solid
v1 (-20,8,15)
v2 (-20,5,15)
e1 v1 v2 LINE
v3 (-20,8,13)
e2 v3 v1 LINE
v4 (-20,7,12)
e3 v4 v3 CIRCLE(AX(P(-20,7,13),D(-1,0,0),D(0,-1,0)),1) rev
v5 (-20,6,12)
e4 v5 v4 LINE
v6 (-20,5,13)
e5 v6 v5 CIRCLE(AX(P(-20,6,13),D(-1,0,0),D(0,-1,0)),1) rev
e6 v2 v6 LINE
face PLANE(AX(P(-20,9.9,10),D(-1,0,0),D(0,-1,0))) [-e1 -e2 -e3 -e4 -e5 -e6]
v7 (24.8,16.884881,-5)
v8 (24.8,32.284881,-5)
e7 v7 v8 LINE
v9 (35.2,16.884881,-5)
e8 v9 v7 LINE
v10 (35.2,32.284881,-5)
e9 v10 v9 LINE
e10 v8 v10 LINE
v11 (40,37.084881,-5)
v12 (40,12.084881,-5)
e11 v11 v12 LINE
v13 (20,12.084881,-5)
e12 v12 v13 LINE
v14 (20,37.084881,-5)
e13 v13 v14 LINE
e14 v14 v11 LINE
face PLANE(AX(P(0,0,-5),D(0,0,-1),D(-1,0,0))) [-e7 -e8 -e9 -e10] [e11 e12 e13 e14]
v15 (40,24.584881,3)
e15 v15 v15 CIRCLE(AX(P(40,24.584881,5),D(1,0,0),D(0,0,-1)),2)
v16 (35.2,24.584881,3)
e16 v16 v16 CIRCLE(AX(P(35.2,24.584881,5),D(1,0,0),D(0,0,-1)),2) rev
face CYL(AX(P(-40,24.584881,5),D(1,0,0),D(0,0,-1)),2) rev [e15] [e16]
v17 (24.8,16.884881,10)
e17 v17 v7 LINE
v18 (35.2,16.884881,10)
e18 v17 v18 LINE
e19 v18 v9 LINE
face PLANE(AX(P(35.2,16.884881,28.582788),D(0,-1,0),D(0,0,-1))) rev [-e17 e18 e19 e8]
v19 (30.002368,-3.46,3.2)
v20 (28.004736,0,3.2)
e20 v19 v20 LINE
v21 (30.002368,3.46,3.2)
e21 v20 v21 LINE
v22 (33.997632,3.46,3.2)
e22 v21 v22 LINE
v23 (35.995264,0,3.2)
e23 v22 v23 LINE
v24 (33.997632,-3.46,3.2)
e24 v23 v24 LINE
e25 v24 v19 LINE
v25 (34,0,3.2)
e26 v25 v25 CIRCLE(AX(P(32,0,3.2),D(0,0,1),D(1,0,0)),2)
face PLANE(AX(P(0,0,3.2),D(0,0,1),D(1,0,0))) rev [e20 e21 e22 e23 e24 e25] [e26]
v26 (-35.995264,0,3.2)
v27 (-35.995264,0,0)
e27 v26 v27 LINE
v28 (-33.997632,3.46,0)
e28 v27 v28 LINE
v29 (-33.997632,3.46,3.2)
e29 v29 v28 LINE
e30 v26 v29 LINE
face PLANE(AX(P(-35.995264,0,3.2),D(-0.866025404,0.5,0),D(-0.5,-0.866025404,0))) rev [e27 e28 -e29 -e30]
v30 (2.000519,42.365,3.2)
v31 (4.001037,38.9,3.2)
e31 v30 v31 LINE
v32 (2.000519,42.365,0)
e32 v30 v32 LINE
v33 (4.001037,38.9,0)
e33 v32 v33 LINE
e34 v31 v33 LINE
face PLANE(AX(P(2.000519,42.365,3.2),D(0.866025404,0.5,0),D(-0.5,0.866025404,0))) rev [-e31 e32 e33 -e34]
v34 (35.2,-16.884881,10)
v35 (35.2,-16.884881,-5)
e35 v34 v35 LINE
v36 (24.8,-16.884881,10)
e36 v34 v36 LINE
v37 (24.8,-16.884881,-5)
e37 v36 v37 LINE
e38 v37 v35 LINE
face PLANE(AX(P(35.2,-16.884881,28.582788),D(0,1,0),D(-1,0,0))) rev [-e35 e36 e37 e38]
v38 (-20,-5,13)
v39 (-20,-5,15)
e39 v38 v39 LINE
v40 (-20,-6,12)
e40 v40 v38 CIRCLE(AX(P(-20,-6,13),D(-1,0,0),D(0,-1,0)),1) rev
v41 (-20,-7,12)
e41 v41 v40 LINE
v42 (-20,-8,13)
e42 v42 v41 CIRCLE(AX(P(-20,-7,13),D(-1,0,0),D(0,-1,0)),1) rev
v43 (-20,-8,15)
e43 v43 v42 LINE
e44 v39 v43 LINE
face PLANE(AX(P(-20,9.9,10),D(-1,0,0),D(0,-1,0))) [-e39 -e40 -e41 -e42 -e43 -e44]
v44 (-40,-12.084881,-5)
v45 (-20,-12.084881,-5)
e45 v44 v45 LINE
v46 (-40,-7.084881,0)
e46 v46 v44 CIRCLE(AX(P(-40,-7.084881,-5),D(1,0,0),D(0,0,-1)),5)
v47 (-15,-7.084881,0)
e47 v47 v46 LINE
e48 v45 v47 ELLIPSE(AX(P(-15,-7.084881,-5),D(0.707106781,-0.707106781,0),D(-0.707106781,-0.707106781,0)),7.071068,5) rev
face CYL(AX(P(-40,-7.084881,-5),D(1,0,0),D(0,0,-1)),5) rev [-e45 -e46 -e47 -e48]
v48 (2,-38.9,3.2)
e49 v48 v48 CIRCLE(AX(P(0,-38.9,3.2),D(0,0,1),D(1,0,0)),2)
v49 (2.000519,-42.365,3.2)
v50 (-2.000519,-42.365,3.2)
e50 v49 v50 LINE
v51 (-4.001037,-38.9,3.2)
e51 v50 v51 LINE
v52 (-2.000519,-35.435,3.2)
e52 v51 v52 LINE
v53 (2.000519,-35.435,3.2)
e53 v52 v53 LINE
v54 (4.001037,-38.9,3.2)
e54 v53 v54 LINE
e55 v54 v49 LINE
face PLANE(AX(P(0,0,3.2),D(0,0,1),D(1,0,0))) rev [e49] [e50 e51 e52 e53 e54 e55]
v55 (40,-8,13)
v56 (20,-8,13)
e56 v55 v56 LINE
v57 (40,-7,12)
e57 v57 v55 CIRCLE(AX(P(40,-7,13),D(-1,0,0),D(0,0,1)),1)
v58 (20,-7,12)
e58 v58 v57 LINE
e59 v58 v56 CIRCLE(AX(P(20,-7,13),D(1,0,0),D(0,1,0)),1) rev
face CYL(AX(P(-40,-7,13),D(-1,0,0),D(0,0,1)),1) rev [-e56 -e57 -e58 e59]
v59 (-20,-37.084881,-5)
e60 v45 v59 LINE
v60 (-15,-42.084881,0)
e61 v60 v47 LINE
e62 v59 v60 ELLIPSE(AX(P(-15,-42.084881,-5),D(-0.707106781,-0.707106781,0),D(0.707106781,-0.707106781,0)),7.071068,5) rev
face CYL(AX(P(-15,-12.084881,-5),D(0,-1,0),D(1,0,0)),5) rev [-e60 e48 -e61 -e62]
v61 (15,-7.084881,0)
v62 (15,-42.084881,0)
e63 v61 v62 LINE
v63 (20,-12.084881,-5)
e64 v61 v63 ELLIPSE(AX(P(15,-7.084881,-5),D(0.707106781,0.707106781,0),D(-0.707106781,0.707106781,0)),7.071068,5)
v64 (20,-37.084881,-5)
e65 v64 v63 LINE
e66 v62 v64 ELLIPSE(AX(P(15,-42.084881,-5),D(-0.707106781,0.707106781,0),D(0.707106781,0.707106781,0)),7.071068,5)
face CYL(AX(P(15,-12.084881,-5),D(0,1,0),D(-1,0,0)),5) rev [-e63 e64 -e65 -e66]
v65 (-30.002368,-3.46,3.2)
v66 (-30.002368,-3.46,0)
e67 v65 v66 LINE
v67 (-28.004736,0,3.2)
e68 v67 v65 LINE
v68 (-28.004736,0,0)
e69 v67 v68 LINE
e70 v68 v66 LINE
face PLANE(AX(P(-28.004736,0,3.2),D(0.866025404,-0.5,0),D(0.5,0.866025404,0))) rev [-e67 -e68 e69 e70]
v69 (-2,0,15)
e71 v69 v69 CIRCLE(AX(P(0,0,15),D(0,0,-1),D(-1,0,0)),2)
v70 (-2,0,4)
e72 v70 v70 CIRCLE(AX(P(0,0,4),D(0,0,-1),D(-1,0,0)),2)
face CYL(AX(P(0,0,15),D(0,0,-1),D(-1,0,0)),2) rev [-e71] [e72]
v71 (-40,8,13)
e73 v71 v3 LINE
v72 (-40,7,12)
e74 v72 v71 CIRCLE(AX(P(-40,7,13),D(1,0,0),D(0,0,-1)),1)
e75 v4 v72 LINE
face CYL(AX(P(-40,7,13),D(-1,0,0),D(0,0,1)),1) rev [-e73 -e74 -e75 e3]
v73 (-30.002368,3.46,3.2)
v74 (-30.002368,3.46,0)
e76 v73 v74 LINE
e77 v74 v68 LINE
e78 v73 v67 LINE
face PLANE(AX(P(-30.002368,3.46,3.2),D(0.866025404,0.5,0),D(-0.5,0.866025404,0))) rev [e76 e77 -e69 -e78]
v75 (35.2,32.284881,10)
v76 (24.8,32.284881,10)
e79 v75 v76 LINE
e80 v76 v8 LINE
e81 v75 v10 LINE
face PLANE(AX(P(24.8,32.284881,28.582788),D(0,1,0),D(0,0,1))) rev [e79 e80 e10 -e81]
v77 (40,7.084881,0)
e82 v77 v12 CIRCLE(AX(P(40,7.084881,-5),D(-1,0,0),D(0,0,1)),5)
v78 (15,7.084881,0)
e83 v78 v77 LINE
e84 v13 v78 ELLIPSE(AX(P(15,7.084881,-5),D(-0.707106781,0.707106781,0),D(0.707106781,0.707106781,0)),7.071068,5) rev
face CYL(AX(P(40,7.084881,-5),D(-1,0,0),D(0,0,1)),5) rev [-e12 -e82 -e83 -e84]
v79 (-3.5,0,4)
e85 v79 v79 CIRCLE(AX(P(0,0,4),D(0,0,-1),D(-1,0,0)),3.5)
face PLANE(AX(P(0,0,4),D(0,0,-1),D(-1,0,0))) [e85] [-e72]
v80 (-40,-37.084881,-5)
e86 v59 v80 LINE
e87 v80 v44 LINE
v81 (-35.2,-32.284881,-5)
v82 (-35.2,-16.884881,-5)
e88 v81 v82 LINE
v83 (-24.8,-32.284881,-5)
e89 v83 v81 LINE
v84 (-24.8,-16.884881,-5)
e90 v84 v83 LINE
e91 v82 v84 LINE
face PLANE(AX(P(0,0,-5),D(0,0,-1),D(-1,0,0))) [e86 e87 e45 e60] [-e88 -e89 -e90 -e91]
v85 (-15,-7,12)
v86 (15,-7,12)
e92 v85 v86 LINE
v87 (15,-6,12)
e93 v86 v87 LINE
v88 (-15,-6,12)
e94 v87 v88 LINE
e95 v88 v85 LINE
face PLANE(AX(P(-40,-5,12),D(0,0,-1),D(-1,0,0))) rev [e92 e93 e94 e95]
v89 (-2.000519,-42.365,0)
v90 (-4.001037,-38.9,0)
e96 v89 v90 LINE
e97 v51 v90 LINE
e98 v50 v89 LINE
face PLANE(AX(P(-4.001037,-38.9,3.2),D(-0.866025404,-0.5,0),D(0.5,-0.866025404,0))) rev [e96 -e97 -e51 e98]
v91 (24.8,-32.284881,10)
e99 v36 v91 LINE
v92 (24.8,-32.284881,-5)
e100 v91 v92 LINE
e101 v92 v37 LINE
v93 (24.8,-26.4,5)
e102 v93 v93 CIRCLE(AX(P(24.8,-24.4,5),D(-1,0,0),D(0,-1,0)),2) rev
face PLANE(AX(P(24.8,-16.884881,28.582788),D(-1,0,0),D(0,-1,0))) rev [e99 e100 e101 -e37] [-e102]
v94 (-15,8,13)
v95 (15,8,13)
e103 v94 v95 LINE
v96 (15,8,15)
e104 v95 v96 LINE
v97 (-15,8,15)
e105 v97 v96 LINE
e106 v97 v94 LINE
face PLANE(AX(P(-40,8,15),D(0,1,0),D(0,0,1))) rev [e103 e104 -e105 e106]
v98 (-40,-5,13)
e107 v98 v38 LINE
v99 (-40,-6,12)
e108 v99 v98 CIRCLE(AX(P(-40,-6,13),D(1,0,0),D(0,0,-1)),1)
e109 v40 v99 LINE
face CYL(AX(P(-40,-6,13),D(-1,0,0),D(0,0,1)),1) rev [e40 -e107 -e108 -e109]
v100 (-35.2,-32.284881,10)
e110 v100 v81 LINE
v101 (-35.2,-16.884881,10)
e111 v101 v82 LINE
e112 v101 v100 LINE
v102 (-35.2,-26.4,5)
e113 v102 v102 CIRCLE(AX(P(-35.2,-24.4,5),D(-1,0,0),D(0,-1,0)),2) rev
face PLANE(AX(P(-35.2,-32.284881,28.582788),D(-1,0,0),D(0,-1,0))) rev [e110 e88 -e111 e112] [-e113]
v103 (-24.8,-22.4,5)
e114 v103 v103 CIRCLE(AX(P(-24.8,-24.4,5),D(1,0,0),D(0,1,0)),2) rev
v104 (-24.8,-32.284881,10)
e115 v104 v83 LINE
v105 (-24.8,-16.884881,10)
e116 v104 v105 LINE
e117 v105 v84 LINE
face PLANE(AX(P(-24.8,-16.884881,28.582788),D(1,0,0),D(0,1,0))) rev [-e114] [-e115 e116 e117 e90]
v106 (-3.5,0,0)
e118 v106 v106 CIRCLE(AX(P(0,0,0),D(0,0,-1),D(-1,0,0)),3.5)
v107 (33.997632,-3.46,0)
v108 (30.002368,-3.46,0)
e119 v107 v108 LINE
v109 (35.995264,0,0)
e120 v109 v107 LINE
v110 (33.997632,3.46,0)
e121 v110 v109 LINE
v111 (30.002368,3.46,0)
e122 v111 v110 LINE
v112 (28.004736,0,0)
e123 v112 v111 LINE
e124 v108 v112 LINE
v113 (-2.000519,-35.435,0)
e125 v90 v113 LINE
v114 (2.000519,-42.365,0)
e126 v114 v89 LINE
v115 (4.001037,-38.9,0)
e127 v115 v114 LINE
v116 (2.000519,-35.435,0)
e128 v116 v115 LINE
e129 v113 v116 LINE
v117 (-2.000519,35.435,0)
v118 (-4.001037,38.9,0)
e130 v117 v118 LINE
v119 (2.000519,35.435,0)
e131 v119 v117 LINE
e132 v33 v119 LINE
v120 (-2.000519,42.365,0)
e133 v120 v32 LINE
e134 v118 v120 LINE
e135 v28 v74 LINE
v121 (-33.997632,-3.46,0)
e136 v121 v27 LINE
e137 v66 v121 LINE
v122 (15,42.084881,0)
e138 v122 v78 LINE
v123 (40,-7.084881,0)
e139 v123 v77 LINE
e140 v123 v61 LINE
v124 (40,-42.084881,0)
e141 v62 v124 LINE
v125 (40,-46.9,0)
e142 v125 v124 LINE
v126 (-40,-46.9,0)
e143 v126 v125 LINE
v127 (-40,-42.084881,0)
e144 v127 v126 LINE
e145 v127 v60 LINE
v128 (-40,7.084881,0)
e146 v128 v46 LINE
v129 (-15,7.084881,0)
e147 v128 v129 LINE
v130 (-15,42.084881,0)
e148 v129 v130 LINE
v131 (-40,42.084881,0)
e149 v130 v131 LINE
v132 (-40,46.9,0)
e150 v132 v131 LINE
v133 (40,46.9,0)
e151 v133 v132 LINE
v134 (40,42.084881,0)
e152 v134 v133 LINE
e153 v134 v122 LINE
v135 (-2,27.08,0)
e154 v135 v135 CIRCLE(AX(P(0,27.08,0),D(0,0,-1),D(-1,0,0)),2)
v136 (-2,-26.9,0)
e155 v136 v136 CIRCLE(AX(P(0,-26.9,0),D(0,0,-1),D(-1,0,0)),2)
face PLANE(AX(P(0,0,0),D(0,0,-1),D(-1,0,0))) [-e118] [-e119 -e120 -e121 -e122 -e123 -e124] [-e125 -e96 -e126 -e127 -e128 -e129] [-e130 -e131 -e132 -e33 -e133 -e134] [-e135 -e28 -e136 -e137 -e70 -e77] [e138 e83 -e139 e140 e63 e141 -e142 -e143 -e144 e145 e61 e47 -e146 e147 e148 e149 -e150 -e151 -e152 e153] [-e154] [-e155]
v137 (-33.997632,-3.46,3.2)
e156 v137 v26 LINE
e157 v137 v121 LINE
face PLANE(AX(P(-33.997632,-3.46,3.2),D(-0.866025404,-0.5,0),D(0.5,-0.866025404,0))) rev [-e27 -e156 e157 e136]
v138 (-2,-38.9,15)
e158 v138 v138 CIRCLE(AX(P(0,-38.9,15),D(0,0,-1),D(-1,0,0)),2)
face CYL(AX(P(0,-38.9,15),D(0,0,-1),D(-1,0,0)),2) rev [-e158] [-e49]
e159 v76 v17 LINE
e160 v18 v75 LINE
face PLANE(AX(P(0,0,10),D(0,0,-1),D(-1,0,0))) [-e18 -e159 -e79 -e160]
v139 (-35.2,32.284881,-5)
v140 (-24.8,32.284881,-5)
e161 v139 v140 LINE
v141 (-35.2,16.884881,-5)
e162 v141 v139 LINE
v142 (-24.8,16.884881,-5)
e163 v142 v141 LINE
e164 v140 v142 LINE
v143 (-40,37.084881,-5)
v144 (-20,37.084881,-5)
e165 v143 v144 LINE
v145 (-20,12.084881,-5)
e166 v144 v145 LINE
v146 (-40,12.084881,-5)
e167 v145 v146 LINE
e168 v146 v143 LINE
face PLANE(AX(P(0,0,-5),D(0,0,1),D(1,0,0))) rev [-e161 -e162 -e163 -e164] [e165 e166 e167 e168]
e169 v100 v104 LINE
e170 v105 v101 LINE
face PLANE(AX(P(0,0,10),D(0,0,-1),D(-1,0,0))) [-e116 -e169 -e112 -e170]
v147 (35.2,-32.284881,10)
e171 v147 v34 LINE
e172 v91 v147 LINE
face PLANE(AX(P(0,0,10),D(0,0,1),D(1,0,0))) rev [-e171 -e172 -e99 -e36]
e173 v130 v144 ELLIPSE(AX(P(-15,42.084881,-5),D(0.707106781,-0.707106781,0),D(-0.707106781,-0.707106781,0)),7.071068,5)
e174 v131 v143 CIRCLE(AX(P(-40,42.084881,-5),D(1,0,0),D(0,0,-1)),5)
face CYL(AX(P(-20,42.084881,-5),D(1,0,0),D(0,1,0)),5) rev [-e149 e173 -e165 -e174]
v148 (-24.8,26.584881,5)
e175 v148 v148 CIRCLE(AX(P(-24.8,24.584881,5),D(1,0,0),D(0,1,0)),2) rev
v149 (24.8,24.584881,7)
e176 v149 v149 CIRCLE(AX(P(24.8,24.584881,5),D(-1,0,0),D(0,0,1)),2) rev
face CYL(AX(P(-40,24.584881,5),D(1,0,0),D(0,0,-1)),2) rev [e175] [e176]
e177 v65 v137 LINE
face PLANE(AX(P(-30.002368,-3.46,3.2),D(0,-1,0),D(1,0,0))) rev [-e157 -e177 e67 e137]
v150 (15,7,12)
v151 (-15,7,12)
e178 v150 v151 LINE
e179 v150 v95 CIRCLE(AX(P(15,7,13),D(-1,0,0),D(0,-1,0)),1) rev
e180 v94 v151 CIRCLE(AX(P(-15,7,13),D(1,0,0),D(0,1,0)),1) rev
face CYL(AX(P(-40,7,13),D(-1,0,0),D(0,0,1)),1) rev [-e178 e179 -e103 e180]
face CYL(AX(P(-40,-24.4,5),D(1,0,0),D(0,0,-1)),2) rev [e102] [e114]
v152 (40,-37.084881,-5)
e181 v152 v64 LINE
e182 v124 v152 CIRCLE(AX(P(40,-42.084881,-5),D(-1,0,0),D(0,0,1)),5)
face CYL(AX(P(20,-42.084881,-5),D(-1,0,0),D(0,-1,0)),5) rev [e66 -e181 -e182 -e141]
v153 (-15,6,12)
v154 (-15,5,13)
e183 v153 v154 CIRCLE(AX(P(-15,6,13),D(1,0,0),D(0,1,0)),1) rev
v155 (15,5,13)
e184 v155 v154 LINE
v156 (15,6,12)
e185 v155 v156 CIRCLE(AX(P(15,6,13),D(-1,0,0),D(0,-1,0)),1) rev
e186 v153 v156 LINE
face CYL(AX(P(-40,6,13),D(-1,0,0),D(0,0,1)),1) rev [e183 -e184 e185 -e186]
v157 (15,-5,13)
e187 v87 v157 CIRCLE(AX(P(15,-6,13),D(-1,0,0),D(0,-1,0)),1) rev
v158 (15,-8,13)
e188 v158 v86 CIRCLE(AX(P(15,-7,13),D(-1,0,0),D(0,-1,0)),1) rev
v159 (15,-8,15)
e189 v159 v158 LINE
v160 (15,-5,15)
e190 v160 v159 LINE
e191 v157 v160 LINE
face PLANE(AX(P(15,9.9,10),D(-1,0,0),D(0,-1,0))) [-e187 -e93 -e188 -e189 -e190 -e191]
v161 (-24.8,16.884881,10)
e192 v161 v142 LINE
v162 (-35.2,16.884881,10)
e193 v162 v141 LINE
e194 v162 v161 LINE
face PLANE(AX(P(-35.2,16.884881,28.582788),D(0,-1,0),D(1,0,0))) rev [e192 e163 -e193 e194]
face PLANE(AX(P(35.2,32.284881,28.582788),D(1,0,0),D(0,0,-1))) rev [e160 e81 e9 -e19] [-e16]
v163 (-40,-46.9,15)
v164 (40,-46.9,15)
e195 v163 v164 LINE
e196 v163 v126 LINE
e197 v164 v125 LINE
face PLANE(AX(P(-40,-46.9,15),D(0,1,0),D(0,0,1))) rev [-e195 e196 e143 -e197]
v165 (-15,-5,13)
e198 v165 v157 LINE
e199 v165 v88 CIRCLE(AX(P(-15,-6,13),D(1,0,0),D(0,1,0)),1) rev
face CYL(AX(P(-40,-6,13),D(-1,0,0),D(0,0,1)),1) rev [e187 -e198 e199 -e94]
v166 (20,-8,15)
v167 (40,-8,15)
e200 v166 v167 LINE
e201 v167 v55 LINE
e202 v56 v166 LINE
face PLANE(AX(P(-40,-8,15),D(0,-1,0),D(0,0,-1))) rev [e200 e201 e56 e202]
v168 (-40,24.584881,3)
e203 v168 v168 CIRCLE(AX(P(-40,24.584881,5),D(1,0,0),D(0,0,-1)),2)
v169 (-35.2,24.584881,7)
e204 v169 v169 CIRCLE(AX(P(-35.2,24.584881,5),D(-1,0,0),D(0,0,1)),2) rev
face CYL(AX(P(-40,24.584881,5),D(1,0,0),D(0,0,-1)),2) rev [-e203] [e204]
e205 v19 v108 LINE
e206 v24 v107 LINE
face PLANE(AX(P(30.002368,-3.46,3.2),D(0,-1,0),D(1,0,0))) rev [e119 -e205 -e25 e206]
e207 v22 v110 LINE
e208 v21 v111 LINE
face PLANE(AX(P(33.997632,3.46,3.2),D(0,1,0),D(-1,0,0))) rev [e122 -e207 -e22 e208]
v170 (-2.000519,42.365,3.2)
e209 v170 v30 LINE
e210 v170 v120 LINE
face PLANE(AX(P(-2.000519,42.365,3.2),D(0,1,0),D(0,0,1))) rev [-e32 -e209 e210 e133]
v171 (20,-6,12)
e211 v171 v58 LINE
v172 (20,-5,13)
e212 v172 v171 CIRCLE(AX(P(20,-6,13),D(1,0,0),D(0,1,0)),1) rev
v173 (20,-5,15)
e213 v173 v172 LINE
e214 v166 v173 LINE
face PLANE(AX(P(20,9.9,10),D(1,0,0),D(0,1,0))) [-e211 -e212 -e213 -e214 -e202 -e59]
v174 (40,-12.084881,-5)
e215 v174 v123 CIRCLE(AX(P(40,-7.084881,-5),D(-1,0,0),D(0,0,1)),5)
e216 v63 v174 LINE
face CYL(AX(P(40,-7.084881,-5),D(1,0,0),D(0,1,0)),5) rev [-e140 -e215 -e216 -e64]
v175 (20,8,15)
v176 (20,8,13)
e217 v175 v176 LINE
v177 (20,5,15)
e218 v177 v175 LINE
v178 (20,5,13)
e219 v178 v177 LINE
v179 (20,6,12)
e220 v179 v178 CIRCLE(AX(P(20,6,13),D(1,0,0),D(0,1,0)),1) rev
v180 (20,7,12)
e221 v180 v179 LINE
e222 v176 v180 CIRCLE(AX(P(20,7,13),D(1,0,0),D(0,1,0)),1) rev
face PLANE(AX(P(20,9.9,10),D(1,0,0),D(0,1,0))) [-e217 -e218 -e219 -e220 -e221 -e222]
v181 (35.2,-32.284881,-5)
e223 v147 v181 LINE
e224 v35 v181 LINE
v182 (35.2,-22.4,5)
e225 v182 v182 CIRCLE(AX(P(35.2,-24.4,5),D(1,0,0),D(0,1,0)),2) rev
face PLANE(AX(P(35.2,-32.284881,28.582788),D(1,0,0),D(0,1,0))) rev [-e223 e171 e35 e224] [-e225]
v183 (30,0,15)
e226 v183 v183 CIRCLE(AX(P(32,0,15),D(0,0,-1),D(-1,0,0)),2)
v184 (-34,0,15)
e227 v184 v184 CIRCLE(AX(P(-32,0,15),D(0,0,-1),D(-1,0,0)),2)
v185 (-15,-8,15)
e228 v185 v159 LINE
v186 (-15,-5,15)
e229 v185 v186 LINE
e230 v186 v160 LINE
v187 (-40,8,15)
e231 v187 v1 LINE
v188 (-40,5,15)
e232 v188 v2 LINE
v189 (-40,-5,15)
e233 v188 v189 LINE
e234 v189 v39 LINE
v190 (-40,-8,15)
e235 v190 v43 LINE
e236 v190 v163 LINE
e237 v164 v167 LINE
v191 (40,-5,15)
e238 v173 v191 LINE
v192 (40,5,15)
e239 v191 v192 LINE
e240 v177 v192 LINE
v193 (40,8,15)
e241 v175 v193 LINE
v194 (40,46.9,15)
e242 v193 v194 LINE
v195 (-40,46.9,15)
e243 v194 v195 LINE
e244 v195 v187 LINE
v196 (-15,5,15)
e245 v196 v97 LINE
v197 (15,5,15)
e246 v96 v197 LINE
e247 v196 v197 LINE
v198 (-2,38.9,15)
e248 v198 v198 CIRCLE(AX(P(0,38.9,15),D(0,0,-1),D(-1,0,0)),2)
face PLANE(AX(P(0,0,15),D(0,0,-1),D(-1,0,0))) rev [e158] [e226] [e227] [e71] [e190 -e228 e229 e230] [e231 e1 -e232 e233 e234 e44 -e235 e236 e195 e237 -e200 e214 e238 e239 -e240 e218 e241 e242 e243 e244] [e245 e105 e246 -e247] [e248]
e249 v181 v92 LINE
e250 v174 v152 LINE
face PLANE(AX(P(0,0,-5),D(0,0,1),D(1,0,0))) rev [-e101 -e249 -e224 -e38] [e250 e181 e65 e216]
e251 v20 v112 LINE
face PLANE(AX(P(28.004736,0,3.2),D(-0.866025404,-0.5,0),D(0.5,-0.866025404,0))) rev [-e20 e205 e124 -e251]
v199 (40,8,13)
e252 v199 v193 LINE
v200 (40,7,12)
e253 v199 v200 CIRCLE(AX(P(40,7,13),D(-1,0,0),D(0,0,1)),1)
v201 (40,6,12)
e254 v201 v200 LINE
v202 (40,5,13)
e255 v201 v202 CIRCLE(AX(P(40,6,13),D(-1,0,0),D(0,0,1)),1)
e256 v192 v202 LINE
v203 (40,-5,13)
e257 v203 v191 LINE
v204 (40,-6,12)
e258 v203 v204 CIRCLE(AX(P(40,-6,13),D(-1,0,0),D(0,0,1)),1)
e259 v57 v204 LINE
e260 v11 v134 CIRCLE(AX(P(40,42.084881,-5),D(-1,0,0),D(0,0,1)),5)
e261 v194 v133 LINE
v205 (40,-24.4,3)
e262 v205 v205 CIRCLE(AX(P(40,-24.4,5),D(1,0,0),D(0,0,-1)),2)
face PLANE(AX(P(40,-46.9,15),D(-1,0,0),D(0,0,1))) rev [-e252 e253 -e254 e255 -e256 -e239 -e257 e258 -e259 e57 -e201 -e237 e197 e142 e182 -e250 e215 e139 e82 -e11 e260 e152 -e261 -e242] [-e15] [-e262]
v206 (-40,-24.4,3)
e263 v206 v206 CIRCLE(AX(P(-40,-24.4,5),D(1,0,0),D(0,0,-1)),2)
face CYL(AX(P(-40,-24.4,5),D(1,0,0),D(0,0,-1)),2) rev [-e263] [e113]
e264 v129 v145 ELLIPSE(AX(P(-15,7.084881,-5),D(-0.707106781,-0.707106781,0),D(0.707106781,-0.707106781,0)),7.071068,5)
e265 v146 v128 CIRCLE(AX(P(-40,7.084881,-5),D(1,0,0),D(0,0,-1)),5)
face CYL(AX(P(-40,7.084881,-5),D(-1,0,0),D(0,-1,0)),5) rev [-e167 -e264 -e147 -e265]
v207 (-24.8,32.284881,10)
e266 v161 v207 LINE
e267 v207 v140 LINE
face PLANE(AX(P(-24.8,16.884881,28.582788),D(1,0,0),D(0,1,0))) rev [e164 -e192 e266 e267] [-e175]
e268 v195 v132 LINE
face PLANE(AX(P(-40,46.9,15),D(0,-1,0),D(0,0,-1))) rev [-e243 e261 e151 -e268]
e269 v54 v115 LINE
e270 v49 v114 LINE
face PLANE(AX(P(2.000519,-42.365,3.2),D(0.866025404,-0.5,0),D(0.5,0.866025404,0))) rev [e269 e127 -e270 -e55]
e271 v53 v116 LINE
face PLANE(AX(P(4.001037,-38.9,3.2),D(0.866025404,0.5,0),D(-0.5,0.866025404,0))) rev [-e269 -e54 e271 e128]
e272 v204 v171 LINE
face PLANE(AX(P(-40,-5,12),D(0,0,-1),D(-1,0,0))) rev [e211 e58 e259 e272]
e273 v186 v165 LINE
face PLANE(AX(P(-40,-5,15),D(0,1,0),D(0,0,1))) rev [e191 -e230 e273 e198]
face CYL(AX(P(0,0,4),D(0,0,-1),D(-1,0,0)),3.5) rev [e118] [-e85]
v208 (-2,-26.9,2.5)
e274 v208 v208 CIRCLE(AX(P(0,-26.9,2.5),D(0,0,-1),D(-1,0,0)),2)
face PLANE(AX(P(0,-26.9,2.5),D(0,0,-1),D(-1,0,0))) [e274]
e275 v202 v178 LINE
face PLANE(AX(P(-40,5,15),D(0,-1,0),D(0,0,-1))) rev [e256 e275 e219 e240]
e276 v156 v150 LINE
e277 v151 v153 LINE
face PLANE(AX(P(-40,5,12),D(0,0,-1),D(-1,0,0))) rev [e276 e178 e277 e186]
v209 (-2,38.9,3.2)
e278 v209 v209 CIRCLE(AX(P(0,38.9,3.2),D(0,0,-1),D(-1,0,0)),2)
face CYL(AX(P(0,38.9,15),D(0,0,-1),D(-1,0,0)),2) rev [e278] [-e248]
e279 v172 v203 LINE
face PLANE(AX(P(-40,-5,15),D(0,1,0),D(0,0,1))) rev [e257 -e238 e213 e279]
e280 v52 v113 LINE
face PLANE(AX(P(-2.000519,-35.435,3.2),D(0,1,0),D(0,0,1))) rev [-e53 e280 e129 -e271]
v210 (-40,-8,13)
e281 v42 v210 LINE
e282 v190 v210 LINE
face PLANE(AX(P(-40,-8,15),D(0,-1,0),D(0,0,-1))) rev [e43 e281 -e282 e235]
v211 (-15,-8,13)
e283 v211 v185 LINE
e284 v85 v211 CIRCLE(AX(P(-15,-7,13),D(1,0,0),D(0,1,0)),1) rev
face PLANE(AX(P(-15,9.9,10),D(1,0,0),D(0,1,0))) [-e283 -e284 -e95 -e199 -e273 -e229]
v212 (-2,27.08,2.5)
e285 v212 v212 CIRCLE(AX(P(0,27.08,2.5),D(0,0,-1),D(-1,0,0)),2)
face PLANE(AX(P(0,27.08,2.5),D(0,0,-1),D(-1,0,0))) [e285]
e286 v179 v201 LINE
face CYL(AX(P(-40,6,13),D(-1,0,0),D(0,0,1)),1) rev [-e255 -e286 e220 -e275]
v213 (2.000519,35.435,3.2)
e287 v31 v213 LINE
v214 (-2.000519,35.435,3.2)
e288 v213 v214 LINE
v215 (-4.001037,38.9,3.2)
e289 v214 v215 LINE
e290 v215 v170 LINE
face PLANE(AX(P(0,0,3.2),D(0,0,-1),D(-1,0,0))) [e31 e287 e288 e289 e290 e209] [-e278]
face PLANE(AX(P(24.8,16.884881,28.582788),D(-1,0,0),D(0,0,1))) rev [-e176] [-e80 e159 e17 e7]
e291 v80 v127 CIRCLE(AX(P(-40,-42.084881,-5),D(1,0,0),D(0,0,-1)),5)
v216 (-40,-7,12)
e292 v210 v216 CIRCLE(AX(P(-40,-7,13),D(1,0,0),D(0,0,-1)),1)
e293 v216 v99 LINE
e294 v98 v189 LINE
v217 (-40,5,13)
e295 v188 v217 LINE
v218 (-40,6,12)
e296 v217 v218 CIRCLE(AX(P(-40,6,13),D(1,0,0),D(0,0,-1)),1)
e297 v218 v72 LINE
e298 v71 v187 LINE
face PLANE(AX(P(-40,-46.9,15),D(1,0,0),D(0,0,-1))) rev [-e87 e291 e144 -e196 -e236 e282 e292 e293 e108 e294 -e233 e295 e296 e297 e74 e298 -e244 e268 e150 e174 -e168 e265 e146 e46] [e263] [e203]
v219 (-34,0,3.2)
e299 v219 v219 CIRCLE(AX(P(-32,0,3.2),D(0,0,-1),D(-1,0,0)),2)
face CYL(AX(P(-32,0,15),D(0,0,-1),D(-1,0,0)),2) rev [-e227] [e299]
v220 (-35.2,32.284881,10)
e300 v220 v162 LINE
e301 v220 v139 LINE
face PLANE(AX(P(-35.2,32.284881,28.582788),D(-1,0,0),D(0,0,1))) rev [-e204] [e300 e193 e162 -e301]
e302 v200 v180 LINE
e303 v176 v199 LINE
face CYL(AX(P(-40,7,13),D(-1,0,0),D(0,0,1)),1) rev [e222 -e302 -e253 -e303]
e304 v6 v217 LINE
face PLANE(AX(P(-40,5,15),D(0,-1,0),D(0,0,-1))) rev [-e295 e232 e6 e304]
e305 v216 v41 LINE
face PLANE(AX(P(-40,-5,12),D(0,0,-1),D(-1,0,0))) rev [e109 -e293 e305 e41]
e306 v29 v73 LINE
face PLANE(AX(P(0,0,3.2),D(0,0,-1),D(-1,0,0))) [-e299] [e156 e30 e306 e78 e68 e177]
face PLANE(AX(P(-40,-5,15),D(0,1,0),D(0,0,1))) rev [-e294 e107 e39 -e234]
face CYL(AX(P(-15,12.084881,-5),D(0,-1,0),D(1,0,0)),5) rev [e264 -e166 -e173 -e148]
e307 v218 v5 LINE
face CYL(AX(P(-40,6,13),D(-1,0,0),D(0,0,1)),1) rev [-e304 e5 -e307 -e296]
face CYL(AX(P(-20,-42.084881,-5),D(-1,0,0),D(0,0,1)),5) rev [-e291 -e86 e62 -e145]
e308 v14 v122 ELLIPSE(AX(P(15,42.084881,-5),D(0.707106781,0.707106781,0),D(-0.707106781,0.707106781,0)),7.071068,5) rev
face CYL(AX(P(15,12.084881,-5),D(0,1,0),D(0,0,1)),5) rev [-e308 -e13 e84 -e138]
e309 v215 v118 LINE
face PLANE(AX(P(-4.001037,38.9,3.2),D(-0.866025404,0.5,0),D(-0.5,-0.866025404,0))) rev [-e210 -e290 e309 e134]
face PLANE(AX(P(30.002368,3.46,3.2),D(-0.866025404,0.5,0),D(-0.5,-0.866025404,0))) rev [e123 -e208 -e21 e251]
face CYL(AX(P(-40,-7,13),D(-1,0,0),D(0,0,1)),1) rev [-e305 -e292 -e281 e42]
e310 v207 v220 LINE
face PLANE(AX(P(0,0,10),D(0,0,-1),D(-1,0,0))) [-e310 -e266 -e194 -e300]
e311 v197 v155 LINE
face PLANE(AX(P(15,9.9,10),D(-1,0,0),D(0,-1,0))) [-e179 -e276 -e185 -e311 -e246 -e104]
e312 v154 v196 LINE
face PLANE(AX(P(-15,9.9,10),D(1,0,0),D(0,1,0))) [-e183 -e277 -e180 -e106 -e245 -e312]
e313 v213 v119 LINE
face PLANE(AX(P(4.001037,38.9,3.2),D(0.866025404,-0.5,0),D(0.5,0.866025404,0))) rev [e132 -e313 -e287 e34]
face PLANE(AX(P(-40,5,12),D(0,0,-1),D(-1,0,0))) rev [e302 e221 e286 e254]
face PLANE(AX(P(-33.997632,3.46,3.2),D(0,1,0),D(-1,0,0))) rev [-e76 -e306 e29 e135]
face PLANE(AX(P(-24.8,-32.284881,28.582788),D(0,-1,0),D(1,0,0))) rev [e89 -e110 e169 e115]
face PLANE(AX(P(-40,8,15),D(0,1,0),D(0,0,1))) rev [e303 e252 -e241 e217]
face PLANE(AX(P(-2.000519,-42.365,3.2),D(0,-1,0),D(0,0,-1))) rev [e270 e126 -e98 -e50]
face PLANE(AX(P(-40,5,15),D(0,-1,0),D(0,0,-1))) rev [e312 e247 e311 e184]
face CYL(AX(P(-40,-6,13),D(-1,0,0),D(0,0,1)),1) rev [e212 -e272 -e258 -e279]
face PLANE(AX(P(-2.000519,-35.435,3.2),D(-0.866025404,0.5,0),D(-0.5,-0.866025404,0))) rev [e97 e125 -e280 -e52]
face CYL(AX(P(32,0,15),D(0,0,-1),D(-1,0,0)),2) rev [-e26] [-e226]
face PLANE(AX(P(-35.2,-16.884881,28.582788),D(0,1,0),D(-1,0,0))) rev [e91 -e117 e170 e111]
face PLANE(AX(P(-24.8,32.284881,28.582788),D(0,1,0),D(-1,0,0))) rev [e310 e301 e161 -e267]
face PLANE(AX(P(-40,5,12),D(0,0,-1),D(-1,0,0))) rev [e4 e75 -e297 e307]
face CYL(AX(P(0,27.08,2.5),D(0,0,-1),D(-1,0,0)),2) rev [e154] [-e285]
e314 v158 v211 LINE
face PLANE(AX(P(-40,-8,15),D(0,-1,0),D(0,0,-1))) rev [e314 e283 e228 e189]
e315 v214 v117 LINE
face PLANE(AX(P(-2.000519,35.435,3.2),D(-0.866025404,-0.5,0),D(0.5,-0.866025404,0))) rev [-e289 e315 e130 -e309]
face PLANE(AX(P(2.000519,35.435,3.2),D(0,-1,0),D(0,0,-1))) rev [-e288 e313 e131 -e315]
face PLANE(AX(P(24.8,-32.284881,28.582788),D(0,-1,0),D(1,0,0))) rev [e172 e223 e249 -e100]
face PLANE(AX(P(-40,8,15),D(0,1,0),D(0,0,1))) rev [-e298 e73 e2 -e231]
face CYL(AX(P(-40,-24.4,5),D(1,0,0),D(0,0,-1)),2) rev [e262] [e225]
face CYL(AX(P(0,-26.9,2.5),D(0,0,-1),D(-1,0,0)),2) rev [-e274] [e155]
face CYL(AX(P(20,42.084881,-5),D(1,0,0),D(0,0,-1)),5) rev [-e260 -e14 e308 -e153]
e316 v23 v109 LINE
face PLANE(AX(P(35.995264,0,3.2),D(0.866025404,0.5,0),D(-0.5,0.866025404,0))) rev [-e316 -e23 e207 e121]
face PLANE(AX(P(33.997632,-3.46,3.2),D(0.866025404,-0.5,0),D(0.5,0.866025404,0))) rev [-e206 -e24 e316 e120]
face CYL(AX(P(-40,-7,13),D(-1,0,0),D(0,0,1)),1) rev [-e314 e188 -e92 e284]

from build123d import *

# Parameters (mm, degrees)
SKETCH1_W           = 80
SKETCH1_H           = 93.8
BOSS_EXTRUDE1_DEPTH = 15
SKETCH2_W           = 10
SKETCH2_H           = 15
CUT_EXTRUDE1_DEPTH  = 10
SKETCH3_R           = 2
CUT_EXTRUDE2_DEPTH  = 94.939395357
SKETCH4_W           = 20
SKETCH4_H           = 25
SKETCH4_W_2         = 10
SKETCH4_H_2         = 15
BOSS_EXTRUDE2_DEPTH = 5
FILLET1_R           = 5
SKETCH5_R           = 2
CUT_EXTRUDE3_DEPTH  = 2.5
SKETCH6_W           = 3
SKETCH6_H           = 3
CUT_EXTRUDE4_DEPTH  = 94.939395357
SKETCH7_R           = 2
CUT_EXTRUDE5_DEPTH  = 3.2
SKETCH8_R           = 2
CUT_EXTRUDE6_DEPTH  = 64.439813997
CUT_EXTRUDE7_REACH  = 66.804
SKETCH9_W           = 10.4
SKETCH9_H           = 15.4
SKETCH10_R          = 3.5
CUT_EXTRUDE8_DEPTH  = 4
SKETCH11_R          = 2
CUT_EXTRUDE9_DEPTH  = 64.439813997
FILLET3_R           = 1
SKETCH12_W          = 5
SKETCH12_H          = 20
BOSS_EXTRUDE4_DEPTH = 5


with BuildPart() as part:
    # Sketch1 → Boss-Extrude1 (new body)
    with BuildSketch(Plane.XY):
        Rectangle(SKETCH1_W, SKETCH1_H)
    extrude(amount=BOSS_EXTRUDE1_DEPTH)

    # Sketch2 → Cut-Extrude1 (cut)
    with BuildSketch(Plane(origin=(0, 0, 0), x_dir=(-1, 0, 0), z_dir=(0, 0, -1))):
        with Locations((30, -24.4)):
            Rectangle(SKETCH2_W, SKETCH2_H)
        with Locations((-30, -24.4)):
            Rectangle(SKETCH2_W, SKETCH2_H)
        with Locations((30, 24.584880812)):
            Rectangle(SKETCH2_W, SKETCH2_H)
        with Locations((-30, 24.584880812)):
            Rectangle(SKETCH2_W, SKETCH2_H)
    extrude(amount=-CUT_EXTRUDE1_DEPTH, mode=Mode.SUBTRACT)

    # Sketch3 → Cut-Extrude2 (cut, through all)
    with BuildSketch(Plane(origin=(40, 0, 0), x_dir=(0, 0, -1), z_dir=(1, 0, 0))):
        with Locations((-5, 24.584880812)):
            Circle(SKETCH3_R)
        with Locations((-5, -24.4)):
            Circle(SKETCH3_R)
    extrude(amount=-CUT_EXTRUDE2_DEPTH, mode=Mode.SUBTRACT)

    # Sketch4 → Boss-Extrude2 (add)
    # profile 1 of 4: a face of its own
    with BuildSketch(Plane(origin=(0, 0, 0), x_dir=(-1, 0, 0), z_dir=(0, 0, -1))):
        with Locations((-30, 24.584880812)):
            Rectangle(SKETCH4_W, SKETCH4_H)
        with Locations((-30, 24.584880812)):
            Rectangle(SKETCH4_W_2, SKETCH4_H_2, mode=Mode.SUBTRACT)
    # profile 2 of 4: a face of its own
    with BuildSketch(Plane(origin=(0, 0, 0), x_dir=(-1, 0, 0), z_dir=(0, 0, -1))):
        with Locations((30, 24.584880812)):
            Rectangle(SKETCH4_W, SKETCH4_H)
        with Locations((30, 24.584880812)):
            Rectangle(SKETCH4_W_2, SKETCH4_H_2, mode=Mode.SUBTRACT)
    # profile 3 of 4: a face of its own
    with BuildSketch(Plane(origin=(0, 0, 0), x_dir=(-1, 0, 0), z_dir=(0, 0, -1))):
        with Locations((30, -24.584880812)):
            Rectangle(SKETCH4_W, SKETCH4_H)
        with Locations((30, -24.584880812)):
            Rectangle(SKETCH4_W_2, SKETCH4_H_2, mode=Mode.SUBTRACT)
    # profile 4 of 4: a face of its own
    with BuildSketch(Plane(origin=(0, 0, 0), x_dir=(-1, 0, 0), z_dir=(0, 0, -1))):
        with Locations((-30, -24.584880812)):
            Rectangle(SKETCH4_W, SKETCH4_H)
        with Locations((-30, -24.584880812)):
            Rectangle(SKETCH4_W_2, SKETCH4_H_2, mode=Mode.SUBTRACT)
    extrude(amount=BOSS_EXTRUDE2_DEPTH)

    # Fillet1
    fillet1_edges = [part.edges().sort_by_distance(p)[0] for p in [
        (-30, -37.084880812, 0),
        (30, -37.084880812, 0),
        (-30, -12.084880812, 0),
        (30, -12.084880812, 0),
        (-30, 37.084880812, 0),
        (30, 37.084880812, 0),
        (-30, 12.084880812, 0),
        (30, 12.084880812, 0),
        (20, 24.584880812, 0),
        (-20, 24.584880812, 0),
        (-20, -24.584880812, 0),
        (20, -24.584880812, 0),
    ]]
    fillet(fillet1_edges, radius=FILLET1_R - 0.0001)  # a hair under: the kernel refuses the full size

    # Sketch5 → Cut-Extrude3 (cut)
    with BuildSketch(Plane(origin=(0, 0, 0), x_dir=(-1, 0, 0), z_dir=(0, 0, -1))):
        with Locations((0, -26.9)):
            Circle(SKETCH5_R)
        with Locations((0, 27.08)):
            Circle(SKETCH5_R)
    extrude(amount=-CUT_EXTRUDE3_DEPTH, mode=Mode.SUBTRACT)

    # Sketch6 → Cut-Extrude4 (cut, through all)
    with BuildSketch(Plane(origin=(40, 0, 0), x_dir=(0, 0, -1), z_dir=(1, 0, 0))):
        with Locations((-13.5, 6.5)):
            Rectangle(SKETCH6_W, SKETCH6_H)
        with Locations((-13.5, -6.5)):
            Rectangle(SKETCH6_W, SKETCH6_H)
    extrude(amount=-CUT_EXTRUDE4_DEPTH, mode=Mode.SUBTRACT)

    # Sketch7 → Cut-Extrude5 (cut)
    # profile 1 of 4: a face of its own
    with BuildSketch(Plane(origin=(0, 0, 0), x_dir=(-1, 0, 0), z_dir=(0, 0, -1))):
        Polygon((-2.000518683, -42.365), (-4.001037365, -38.9), (-2.000518683, -35.435), (2.000518683, -35.435), (4.001037365, -38.9), (2.000518683, -42.365), align=None)
        with Locations(Location((0, -38.9, 0), (0, 0, 180))):
            Circle(SKETCH7_R, mode=Mode.SUBTRACT)
    # profile 2 of 4: a face of its own
    with BuildSketch(Plane(origin=(0, 0, 0), x_dir=(-1, 0, 0), z_dir=(0, 0, -1))):
        Polygon((28.004736137, 0), (30.002368069, -3.46), (33.997631931, -3.46), (35.995263863, 0), (33.997631931, 3.46), (30.002368069, 3.46), align=None)
        with Locations((32, 0)):
            Circle(SKETCH7_R, mode=Mode.SUBTRACT)
    # profile 3 of 4: a face of its own
    with BuildSketch(Plane(origin=(0, 0, 0), x_dir=(-1, 0, 0), z_dir=(0, 0, -1))):
        Polygon((-4.001037365, 38.9), (-2.000518683, 35.435), (2.000518683, 35.435), (4.001037365, 38.9), (2.000518683, 42.365), (-2.000518683, 42.365), align=None)
        with Locations((0, 38.9)):
            Circle(SKETCH7_R, mode=Mode.SUBTRACT)
    # profile 4 of 4: a face of its own
    with BuildSketch(Plane(origin=(0, 0, 0), x_dir=(-1, 0, 0), z_dir=(0, 0, -1))):
        Polygon((-30.002368069, 3.46), (-28.004736137, 0), (-30.002368069, -3.46), (-33.997631931, -3.46), (-35.995263863, 0), (-33.997631931, 3.46), align=None)
        with Locations(Location((-32, 0, 0), (0, 0, 180))):
            Circle(SKETCH7_R, mode=Mode.SUBTRACT)
    extrude(amount=-CUT_EXTRUDE5_DEPTH, mode=Mode.SUBTRACT)

    # Sketch8 → Cut-Extrude6 (cut, through all)
    with BuildSketch(Plane(origin=(0, 0, 0), x_dir=(-1, 0, 0), z_dir=(0, 0, -1))):
        with Locations((-32, 0)):
            Circle(SKETCH8_R)
        with Locations((0, -38.9)):
            Circle(SKETCH8_R)
        with Locations((32, 0)):
            Circle(SKETCH8_R)
        with Locations((0, 38.9)):
            Circle(SKETCH8_R)
    extrude(amount=-CUT_EXTRUDE6_DEPTH, mode=Mode.SUBTRACT)

    # Cut-Extrude7: up to this face of the body (flat: up to its plane)
    cut_extrude7_end = Plane(part.part.faces().sort_by_distance((30, 24.584880812, 10))[0])
    # Sketch9 → Cut-Extrude7 (cut, up to the picked face)
    with BuildSketch(Plane(origin=(0, 0, -5), x_dir=(-1, 0, 0), z_dir=(0, 0, -1)), mode=Mode.PRIVATE) as cut_extrude7_sk1:
        with Locations((-30, 24.584880812)):
            Rectangle(SKETCH9_W, SKETCH9_H)
    cut_extrude7_tool1 = split(extrude(cut_extrude7_sk1.sketch, amount=-CUT_EXTRUDE7_REACH, mode=Mode.PRIVATE), bisect_by=cut_extrude7_end, keep=Keep.BOTH, mode=Mode.PRIVATE)
    # Sketch9 → Cut-Extrude7 (cut, up to the picked face)
    with BuildSketch(Plane(origin=(0, 0, -5), x_dir=(-1, 0, 0), z_dir=(0, 0, -1)), mode=Mode.PRIVATE) as cut_extrude7_sk2:
        with Locations((30, 24.584880812)):
            Rectangle(SKETCH9_W, SKETCH9_H)
    cut_extrude7_tool2 = split(extrude(cut_extrude7_sk2.sketch, amount=-CUT_EXTRUDE7_REACH, mode=Mode.PRIVATE), bisect_by=cut_extrude7_end, keep=Keep.BOTH, mode=Mode.PRIVATE)
    # Sketch9 → Cut-Extrude7 (cut, up to the picked face)
    with BuildSketch(Plane(origin=(0, 0, -5), x_dir=(-1, 0, 0), z_dir=(0, 0, -1)), mode=Mode.PRIVATE) as cut_extrude7_sk3:
        with Locations((30, -24.584880812)):
            Rectangle(SKETCH9_W, SKETCH9_H)
    cut_extrude7_tool3 = split(extrude(cut_extrude7_sk3.sketch, amount=-CUT_EXTRUDE7_REACH, mode=Mode.PRIVATE), bisect_by=cut_extrude7_end, keep=Keep.BOTH, mode=Mode.PRIVATE)
    # Sketch9 → Cut-Extrude7 (cut, up to the picked face)
    with BuildSketch(Plane(origin=(0, 0, -5), x_dir=(-1, 0, 0), z_dir=(0, 0, -1)), mode=Mode.PRIVATE) as cut_extrude7_sk4:
        with Locations((-30, -24.584880812)):
            Rectangle(SKETCH9_W, SKETCH9_H)
    cut_extrude7_tool4 = split(extrude(cut_extrude7_sk4.sketch, amount=-CUT_EXTRUDE7_REACH, mode=Mode.PRIVATE), bisect_by=cut_extrude7_end, keep=Keep.BOTH, mode=Mode.PRIVATE)
    add(cut_extrude7_tool1.solids().sort_by(Axis((30, 24.584881, -5), (0, 0, 1)))[0], mode=Mode.SUBTRACT)
    add(cut_extrude7_tool2.solids().sort_by(Axis((-30, 24.584881, -5), (0, 0, 1)))[0], mode=Mode.SUBTRACT)
    add(cut_extrude7_tool3.solids().sort_by(Axis((-30, -24.584881, -5), (0, 0, 1)))[0], mode=Mode.SUBTRACT)
    add(cut_extrude7_tool4.solids().sort_by(Axis((30, -24.584881, -5), (0, 0, 1)))[0], mode=Mode.SUBTRACT)

    # Sketch10 → Cut-Extrude8 (cut)
    with BuildSketch(Plane(origin=(0, 0, 0), x_dir=(-1, 0, 0), z_dir=(0, 0, -1))):
        Circle(SKETCH10_R)
    extrude(amount=-CUT_EXTRUDE8_DEPTH, mode=Mode.SUBTRACT)

    # Sketch11 → Cut-Extrude9 (cut, through all)
    with BuildSketch(Plane(origin=(0, 0, 0), x_dir=(-1, 0, 0), z_dir=(0, 0, -1))):
        Circle(SKETCH11_R)
    extrude(amount=-CUT_EXTRUDE9_DEPTH, mode=Mode.SUBTRACT)

    # Fillet3
    fillet3_edges = [part.edges().sort_by_distance(p)[0] for p in [
        (0, 8, 12),
        (0, 5, 12),
        (0, -5, 12),
        (0, -8, 12),
    ]]
    fillet(fillet3_edges, radius=FILLET3_R)

    # Sketch12 → Boss-Extrude4 (add)
    with BuildSketch(Plane.XY.offset(15)):
        with Locations((-17.5, -0.1)):
            Rectangle(SKETCH12_W, SKETCH12_H)
        with Locations((17.5, -0.1)):
            Rectangle(SKETCH12_W, SKETCH12_H)
    extrude(amount=-BOSS_EXTRUDE4_DEPTH)


solid = part.part
